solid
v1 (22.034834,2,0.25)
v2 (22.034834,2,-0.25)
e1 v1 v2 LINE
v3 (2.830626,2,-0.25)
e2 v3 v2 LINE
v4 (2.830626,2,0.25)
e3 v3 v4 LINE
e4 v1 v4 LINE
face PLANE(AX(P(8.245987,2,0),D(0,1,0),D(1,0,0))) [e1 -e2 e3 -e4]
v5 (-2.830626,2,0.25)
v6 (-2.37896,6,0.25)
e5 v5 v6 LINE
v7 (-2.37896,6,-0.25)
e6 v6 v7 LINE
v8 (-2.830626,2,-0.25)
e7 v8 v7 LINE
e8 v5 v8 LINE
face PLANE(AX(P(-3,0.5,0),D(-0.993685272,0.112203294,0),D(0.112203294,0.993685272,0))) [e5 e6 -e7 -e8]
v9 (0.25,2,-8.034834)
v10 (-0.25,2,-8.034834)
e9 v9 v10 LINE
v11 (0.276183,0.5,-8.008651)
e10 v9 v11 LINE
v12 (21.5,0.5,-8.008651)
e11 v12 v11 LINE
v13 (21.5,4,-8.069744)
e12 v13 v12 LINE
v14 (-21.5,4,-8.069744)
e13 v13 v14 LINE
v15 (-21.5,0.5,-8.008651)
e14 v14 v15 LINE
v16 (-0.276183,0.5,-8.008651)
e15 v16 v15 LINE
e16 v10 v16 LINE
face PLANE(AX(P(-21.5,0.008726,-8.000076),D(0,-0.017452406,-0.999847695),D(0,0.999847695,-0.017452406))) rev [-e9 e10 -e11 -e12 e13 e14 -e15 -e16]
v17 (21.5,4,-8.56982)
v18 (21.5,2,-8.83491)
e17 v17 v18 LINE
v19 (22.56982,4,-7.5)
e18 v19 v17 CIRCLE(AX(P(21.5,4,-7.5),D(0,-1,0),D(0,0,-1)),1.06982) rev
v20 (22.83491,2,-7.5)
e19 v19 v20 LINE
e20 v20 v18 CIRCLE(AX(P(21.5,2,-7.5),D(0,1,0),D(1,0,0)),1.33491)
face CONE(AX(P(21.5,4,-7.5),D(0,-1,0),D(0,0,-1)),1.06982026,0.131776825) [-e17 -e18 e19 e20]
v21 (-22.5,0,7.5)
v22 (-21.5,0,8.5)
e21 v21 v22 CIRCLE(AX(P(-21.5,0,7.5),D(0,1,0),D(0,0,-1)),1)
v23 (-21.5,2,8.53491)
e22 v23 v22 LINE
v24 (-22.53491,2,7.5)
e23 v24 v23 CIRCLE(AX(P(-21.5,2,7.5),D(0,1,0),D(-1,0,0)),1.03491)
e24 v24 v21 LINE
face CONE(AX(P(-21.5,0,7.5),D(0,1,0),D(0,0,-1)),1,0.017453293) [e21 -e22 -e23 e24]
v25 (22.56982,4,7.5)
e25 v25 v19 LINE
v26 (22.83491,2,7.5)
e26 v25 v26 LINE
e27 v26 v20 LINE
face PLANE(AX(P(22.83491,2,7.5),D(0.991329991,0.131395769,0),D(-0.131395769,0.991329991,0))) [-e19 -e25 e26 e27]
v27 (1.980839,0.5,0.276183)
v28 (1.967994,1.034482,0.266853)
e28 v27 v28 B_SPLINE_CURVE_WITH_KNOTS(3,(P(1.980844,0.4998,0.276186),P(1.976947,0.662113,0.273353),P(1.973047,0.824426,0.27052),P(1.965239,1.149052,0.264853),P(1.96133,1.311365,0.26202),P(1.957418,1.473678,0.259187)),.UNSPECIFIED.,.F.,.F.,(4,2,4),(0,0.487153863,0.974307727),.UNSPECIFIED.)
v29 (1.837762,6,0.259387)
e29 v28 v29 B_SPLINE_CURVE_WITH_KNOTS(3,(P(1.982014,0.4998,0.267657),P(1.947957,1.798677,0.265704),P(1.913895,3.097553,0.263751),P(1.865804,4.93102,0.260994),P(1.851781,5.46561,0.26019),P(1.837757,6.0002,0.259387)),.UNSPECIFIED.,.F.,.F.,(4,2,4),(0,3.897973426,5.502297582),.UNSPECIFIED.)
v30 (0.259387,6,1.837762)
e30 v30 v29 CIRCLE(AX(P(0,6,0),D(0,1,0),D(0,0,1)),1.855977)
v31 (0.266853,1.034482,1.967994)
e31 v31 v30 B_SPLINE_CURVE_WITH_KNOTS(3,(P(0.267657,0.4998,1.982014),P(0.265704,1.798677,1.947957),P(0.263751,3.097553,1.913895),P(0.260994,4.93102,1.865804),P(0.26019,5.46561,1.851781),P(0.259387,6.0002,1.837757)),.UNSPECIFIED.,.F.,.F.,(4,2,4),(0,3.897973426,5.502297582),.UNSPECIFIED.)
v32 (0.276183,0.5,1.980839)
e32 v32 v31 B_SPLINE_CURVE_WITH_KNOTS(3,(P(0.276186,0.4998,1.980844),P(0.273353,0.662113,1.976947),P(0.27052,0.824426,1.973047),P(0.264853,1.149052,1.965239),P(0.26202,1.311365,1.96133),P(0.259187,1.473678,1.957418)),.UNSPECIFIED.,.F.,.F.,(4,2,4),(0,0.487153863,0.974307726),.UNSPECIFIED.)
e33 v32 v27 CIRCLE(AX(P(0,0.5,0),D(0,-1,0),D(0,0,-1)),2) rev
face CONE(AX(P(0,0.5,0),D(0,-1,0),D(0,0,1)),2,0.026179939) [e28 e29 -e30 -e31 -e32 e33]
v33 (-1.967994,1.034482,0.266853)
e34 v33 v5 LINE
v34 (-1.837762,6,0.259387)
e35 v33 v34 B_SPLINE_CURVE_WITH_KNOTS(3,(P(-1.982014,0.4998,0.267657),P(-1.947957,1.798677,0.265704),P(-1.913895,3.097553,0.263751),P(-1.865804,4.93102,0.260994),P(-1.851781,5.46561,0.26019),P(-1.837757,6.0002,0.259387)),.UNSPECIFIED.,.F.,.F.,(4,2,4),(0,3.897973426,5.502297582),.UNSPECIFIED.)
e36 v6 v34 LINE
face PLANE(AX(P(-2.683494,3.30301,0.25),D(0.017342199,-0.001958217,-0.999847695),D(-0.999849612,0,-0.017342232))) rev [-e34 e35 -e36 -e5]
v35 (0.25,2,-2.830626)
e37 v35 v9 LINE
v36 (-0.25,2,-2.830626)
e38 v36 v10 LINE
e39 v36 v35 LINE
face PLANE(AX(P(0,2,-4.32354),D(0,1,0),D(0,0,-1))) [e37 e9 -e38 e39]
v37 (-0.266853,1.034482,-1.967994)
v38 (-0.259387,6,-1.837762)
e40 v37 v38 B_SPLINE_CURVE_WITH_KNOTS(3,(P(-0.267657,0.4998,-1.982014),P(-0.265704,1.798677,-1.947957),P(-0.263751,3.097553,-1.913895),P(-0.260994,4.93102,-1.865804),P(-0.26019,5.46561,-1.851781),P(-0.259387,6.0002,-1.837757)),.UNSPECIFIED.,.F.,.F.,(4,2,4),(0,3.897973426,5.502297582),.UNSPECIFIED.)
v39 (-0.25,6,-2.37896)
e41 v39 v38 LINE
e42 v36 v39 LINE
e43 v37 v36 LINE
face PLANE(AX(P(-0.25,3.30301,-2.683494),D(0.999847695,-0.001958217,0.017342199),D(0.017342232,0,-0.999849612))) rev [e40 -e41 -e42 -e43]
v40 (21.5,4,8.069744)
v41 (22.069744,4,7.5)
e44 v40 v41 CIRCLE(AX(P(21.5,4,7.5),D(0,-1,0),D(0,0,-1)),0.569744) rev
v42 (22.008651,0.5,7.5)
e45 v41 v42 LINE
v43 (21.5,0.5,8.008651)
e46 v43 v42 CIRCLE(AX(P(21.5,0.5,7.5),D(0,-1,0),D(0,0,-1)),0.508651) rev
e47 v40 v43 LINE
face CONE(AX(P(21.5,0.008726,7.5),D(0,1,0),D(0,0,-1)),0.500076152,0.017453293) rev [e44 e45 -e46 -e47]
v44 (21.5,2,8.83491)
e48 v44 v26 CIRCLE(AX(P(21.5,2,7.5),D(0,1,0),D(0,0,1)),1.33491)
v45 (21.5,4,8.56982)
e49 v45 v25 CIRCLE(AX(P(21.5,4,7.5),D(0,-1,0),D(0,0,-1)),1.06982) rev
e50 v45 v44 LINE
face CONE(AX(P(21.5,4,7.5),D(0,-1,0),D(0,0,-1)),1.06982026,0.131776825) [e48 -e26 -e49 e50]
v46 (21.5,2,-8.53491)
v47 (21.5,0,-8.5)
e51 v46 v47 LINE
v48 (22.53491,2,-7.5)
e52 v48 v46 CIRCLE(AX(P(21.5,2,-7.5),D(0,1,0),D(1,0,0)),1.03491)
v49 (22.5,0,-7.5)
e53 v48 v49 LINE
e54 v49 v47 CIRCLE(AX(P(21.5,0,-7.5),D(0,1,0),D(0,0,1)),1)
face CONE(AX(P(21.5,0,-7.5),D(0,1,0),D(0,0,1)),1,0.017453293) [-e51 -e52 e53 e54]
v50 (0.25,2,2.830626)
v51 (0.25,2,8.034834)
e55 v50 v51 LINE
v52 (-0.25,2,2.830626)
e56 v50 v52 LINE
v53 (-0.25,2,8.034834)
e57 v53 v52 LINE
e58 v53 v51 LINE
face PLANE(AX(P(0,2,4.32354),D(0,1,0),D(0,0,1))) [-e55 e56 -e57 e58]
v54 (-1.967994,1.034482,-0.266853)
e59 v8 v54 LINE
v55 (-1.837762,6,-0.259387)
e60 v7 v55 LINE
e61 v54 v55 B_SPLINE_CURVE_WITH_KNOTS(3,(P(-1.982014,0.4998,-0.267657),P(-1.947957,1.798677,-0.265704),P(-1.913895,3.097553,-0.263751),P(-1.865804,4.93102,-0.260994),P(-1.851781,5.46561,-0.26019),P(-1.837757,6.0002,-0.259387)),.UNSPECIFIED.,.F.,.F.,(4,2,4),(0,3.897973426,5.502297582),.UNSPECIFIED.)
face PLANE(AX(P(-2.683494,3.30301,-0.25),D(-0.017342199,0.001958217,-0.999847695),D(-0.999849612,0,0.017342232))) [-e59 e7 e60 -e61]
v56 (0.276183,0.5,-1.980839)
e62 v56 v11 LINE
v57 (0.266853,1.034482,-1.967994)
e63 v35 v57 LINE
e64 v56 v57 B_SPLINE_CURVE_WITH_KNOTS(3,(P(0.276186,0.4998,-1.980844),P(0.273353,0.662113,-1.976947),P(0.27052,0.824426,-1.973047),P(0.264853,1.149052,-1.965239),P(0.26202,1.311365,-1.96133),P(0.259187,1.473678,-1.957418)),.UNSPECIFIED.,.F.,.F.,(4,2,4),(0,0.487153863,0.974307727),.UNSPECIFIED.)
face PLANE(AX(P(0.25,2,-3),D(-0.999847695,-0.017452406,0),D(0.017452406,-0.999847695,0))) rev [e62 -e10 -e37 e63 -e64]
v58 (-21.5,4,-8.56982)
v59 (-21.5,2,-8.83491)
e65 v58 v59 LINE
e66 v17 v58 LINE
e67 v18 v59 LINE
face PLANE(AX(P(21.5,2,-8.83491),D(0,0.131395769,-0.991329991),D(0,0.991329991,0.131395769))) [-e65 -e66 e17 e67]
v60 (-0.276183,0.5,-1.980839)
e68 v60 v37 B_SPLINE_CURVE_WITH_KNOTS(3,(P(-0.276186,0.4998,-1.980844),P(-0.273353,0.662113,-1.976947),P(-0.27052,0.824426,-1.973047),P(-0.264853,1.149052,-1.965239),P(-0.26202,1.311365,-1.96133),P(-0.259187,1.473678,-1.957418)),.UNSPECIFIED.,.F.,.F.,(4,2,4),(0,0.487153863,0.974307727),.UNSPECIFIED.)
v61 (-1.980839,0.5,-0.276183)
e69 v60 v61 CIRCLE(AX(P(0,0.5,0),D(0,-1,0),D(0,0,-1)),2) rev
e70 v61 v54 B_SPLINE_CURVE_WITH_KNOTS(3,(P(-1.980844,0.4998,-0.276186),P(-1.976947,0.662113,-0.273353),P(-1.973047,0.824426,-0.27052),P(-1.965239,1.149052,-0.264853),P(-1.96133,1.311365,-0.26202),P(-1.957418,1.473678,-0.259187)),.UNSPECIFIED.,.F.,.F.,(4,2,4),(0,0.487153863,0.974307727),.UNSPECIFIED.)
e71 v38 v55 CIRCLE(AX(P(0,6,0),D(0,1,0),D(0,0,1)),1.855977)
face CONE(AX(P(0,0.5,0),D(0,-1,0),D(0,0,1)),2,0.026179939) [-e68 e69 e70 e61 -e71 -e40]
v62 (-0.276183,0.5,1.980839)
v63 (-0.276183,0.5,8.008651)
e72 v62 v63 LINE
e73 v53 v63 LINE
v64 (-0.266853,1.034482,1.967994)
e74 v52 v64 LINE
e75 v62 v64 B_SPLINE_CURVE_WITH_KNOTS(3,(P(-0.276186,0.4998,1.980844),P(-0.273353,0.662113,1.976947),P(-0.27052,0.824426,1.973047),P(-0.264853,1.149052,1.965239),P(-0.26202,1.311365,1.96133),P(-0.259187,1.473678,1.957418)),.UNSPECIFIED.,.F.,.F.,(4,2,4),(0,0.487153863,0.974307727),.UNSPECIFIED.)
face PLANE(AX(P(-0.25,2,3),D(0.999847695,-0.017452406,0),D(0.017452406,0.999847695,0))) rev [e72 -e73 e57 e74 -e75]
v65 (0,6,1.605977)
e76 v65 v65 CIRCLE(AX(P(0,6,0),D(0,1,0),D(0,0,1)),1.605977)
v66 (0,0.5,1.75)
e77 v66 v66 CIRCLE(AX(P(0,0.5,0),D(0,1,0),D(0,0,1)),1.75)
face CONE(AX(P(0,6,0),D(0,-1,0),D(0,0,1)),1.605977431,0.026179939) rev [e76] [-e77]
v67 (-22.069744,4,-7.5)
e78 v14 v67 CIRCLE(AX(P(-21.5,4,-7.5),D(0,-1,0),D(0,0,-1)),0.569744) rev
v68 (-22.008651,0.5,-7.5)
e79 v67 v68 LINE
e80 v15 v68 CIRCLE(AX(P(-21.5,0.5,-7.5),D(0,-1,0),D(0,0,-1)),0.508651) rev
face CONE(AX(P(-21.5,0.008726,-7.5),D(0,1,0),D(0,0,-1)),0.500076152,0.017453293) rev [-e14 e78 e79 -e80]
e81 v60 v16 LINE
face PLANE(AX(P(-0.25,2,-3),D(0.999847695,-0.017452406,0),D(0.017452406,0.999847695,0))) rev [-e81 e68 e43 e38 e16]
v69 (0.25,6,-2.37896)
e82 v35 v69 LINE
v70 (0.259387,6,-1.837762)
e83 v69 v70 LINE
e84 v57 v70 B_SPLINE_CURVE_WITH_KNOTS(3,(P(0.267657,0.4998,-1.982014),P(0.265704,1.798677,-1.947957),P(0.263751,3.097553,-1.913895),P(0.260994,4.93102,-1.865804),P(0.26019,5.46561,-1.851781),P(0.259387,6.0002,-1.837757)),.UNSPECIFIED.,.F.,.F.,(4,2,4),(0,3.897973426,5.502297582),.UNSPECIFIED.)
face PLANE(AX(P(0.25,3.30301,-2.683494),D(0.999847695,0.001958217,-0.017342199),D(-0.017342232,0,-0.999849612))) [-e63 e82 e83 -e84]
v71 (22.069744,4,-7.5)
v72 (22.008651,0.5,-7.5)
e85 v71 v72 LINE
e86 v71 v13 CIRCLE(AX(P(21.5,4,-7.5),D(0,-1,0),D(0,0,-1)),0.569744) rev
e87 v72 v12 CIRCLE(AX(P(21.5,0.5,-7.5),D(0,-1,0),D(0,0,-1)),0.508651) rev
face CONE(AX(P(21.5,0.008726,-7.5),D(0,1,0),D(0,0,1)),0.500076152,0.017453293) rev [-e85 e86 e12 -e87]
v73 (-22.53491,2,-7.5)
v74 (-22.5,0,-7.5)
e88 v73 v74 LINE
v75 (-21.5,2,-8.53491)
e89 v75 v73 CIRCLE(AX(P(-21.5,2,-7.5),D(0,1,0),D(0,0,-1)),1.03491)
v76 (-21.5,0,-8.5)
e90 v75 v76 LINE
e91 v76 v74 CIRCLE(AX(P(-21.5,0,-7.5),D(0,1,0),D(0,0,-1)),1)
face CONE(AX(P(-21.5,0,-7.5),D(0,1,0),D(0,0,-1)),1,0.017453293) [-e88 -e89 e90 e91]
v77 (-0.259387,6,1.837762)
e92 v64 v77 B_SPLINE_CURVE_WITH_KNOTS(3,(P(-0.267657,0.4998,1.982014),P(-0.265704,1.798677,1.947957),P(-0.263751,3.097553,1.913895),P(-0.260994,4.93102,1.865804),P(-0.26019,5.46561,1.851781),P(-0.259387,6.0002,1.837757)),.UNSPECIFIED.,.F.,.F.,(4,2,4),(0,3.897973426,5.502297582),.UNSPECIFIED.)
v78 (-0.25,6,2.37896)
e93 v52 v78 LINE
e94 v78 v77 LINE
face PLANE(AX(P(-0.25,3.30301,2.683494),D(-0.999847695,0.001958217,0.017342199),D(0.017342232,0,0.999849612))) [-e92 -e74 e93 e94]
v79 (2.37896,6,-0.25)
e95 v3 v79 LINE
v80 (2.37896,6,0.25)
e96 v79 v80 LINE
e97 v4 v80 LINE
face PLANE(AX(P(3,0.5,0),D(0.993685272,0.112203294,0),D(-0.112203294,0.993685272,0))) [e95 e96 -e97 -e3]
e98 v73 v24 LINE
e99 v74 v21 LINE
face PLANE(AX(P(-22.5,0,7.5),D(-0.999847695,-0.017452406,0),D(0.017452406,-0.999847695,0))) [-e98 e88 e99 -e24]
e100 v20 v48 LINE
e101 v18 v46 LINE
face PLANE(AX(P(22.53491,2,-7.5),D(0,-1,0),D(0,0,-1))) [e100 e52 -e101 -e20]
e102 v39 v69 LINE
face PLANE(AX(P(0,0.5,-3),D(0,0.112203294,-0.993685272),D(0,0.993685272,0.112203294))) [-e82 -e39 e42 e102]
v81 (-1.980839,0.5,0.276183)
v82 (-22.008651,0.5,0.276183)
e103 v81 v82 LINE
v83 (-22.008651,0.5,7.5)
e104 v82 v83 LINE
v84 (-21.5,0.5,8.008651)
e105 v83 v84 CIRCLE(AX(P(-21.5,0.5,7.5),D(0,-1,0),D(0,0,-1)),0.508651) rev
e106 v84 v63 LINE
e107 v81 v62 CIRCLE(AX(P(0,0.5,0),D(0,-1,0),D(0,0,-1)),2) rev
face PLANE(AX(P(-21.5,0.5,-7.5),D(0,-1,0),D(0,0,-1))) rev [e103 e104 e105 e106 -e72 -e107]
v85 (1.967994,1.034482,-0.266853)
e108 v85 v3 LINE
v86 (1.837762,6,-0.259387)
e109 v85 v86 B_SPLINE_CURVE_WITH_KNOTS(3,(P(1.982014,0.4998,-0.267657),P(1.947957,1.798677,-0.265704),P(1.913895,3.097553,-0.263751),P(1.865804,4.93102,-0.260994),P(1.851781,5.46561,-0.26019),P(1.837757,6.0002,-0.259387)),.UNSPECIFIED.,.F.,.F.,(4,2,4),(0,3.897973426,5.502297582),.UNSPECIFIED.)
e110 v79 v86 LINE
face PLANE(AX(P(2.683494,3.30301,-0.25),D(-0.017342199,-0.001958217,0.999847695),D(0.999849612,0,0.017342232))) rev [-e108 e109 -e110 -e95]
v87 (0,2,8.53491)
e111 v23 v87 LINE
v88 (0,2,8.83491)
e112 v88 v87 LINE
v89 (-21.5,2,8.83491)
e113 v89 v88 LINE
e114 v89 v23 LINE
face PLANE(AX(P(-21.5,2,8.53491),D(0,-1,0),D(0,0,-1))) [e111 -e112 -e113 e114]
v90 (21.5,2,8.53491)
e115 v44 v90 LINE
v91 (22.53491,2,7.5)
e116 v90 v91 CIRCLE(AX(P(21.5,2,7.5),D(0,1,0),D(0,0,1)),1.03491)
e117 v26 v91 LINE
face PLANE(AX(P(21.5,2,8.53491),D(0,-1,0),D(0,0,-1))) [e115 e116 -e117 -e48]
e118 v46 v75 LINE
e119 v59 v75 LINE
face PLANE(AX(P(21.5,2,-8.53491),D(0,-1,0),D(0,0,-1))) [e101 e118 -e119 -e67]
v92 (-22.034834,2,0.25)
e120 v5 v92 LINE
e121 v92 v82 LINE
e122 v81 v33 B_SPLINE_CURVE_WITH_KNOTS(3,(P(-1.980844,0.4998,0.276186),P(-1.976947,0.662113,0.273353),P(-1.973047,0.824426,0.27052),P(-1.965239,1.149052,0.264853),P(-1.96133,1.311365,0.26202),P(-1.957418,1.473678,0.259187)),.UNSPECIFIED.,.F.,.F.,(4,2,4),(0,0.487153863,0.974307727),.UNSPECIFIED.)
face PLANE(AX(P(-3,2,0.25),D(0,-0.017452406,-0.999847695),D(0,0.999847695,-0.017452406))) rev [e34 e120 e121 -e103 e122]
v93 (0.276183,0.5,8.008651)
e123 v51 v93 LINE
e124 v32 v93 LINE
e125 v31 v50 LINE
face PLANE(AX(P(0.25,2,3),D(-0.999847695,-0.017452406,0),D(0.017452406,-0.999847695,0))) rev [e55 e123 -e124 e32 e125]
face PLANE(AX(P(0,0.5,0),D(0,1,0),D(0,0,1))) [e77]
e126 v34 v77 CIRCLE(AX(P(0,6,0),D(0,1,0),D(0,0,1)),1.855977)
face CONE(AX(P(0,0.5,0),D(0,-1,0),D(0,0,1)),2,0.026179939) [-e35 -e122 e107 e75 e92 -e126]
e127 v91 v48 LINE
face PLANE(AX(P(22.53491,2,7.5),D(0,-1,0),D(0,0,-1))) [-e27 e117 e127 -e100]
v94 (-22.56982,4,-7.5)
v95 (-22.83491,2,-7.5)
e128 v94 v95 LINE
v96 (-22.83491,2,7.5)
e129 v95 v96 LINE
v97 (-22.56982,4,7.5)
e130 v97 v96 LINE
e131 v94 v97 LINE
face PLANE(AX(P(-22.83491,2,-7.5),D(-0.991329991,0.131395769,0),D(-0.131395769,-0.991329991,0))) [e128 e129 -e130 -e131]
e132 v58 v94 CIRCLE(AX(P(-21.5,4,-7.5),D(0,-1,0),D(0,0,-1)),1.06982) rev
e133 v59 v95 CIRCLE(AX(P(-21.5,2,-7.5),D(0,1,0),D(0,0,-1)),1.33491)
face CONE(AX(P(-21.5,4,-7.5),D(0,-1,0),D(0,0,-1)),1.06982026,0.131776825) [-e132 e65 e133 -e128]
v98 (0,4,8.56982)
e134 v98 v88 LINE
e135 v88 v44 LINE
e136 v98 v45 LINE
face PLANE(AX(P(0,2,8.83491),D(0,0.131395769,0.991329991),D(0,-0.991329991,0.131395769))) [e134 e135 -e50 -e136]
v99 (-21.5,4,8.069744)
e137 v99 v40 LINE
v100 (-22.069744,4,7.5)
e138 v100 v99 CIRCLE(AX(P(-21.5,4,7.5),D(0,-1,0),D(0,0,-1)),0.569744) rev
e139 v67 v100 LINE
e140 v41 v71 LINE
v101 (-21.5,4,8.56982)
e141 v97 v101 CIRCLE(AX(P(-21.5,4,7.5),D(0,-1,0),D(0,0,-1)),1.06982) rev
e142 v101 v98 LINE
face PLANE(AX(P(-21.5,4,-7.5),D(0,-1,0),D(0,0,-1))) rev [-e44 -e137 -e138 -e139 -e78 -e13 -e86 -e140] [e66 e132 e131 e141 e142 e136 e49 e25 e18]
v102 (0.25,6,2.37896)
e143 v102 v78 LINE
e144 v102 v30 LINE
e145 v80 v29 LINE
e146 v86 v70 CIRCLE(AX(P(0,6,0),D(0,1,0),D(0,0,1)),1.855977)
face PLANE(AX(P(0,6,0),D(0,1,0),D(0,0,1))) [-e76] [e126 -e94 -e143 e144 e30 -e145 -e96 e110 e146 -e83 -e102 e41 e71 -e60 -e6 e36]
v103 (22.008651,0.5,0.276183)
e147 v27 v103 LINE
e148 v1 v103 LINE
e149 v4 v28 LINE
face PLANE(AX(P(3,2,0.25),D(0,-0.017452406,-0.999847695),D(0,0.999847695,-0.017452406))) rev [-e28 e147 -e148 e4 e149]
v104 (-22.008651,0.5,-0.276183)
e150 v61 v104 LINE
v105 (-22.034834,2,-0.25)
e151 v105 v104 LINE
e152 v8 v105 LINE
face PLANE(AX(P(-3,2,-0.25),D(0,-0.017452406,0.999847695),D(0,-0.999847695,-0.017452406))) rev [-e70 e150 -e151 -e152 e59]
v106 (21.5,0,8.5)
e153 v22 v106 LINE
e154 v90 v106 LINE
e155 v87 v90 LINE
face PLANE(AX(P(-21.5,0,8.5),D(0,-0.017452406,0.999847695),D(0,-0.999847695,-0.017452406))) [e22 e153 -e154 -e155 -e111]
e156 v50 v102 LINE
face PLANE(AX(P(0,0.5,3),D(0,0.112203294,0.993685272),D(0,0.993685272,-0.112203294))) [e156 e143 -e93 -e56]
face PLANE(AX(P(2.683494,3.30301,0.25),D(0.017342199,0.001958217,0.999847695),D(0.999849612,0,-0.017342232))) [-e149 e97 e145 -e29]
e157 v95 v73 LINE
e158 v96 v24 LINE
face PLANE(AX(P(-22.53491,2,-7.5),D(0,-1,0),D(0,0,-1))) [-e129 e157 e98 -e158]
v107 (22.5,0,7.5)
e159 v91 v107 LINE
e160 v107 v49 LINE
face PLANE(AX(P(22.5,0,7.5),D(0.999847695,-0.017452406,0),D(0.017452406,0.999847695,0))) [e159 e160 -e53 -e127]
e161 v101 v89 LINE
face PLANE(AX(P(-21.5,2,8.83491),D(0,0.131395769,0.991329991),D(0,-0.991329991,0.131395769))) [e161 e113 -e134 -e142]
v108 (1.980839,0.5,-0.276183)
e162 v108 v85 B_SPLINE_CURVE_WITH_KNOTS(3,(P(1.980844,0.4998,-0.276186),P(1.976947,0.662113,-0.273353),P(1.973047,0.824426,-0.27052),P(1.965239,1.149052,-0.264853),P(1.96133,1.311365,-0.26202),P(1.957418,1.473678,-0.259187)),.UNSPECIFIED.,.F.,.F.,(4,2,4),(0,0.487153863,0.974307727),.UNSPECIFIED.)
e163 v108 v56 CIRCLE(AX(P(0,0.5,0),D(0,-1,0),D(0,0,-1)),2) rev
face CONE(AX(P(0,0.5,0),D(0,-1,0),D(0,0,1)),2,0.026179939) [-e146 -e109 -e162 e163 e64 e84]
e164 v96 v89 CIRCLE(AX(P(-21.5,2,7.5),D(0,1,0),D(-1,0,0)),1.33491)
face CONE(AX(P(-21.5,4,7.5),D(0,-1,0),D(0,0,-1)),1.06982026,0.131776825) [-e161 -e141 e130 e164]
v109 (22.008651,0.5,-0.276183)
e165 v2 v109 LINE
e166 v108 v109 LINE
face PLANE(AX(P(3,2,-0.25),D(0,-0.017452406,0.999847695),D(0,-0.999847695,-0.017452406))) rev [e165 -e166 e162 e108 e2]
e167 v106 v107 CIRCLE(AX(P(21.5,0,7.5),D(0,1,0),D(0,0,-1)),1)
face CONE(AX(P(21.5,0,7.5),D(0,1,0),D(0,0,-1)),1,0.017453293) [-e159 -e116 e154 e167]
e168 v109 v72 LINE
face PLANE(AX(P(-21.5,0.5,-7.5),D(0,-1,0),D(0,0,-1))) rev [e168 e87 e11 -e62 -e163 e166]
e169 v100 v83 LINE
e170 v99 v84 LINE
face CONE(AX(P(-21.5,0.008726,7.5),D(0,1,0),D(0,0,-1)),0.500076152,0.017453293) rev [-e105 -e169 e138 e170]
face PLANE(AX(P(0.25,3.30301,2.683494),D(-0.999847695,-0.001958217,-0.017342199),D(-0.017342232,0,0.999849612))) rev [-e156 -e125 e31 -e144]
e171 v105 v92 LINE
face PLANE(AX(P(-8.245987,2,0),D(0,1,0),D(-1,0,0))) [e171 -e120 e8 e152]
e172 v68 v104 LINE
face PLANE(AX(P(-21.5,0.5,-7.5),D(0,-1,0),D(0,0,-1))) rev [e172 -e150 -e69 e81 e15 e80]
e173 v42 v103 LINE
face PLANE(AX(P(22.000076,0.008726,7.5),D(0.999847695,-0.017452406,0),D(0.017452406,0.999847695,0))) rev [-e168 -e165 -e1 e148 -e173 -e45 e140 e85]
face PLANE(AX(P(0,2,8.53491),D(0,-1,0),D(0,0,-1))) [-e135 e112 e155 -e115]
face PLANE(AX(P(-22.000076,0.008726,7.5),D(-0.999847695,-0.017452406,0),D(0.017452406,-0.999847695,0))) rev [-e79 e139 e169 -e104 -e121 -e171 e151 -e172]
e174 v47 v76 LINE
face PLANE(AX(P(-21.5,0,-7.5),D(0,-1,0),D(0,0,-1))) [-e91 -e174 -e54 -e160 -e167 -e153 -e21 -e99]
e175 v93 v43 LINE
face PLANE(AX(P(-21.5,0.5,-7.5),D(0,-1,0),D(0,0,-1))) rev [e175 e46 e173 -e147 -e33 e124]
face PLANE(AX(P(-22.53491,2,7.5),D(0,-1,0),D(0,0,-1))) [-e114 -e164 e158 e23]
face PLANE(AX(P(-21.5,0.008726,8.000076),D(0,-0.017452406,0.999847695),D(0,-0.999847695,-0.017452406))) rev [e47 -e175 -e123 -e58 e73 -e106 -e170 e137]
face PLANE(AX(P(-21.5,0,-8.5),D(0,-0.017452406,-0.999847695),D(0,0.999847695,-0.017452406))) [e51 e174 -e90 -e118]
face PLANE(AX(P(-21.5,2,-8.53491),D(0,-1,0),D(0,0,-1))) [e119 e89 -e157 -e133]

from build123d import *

# Parameters (mm, degrees)
BOSS_EXTRUDE1_DEPTH = 4
BOSS_EXTRUDE1_DRAFT = -1
SHELL1_T            = -0.5
SKETCH2_R           = 2
BOSS_EXTRUDE2_DEPTH = 5.5
BOSS_EXTRUDE2_TAPER = 1.5
CIRPATTERN1_COUNT   = 4
SKETCH4_R           = 1.605977431
CUT_EXTRUDE1_DEPTH  = 5.5
CUT_EXTRUDE1_DRAFT  = 1.5
RIB3_START          = -22.069744096
RIB3_DEPTH          = 20.231981802
RIB3_START_2        = 1.837762294
RIB3_2_DEPTH        = 20.231981802
RIB3_START_3        = -8.069744096
RIB3_3_DEPTH        = 6.231981802
RIB3_4_DEPTH        = 6.231981802


with BuildPart() as part:
    # Sketch1 → Boss-Extrude1 (with draft: the straight prism first)
    with BuildSketch(Plane(origin=(0, 0, 0), x_dir=(1, 0, 0), z_dir=(0, 1, 0))):
        with BuildLine():
            Line((-21.5, -8.5), (21.5, -8.5))
            ThreePointArc((21.5, -8.5), (22.207106781, -8.207106781), (22.5, -7.5))
            Line((22.5, -7.5), (22.5, 7.5))
            ThreePointArc((22.5, 7.5), (22.207106781, 8.207106781), (21.5, 8.5))
            Line((21.5, 8.5), (-21.5, 8.5))
            ThreePointArc((-21.5, 8.5), (-22.207106781, 8.207106781), (-22.5, 7.5))
            Line((-22.5, 7.5), (-22.5, -7.5))
            ThreePointArc((-22.5, -7.5), (-22.207106781, -8.207106781), (-21.5, -8.5))
        make_face()
    extrude(amount=BOSS_EXTRUDE1_DEPTH)
    # Boss-Extrude1: the draft: its side faces are tilted about the plane it starts from
    boss_extrude1_sides = [part.faces().sort_by_distance(p)[0] for p in [
        (0, 2, 8.5),
        (22.207106781, 2, 8.207106781),
        (22.5, 2, 0),
        (22.207106781, 2, -8.207106781),
        (0, 2, -8.5),
        (-22.207106781, 2, -8.207106781),
        (-22.5, 2, 0),
        (-22.207106781, 2, 8.207106781),
    ]]
    draft(boss_extrude1_sides, Plane(origin=(0, 0, 0), x_dir=(1, 0, 0), z_dir=(0, 1, 0)), BOSS_EXTRUDE1_DRAFT)

    # Shell1
    shell1_openings = [part.faces().sort_by_distance(p)[0] for p in [
        (0, 4, 0),
    ]]
    offset(amount=SHELL1_T, openings=shell1_openings, kind=Kind.INTERSECTION)

    # Sketch2 → Boss-Extrude2 (add)
    with BuildSketch(Plane(origin=(0, 0.5, 0), x_dir=(1, 0, 0), z_dir=(0, 1, 0))):
        Circle(SKETCH2_R)
    extrude(amount=BOSS_EXTRUDE2_DEPTH, taper=BOSS_EXTRUDE2_TAPER)

    # Rib2: read off the stored shape, not the designer's step
    # Rib2: loft between two sections, ruled curve by curve
    rib2_from = [
        Edge.make_line((1.837762394, 6, 0.25938699), (2.378960183, 6, 0.25)),
        Edge.make_line((1.837762394, 6, -0.25938699), (2.378960183, 6, -0.25)),
        Edge.make_line((2.378960183, 6, -0.25), (2.378960183, 6, 0.25)),
        Edge.make_line((1.837762394, 6, -0.25938699), (1.837762394, 6, 0.25938699)),
    ]
    rib2_to = [
        Edge.make_line((1.982009028, 0.5, 0.267656891), (3, 0.5, 0.25)),
        Edge.make_line((1.982009028, 0.5, -0.267656891), (3, 0.5, -0.25)),
        Edge.make_line((3, 0.5, -0.25), (3, 0.5, 0.25)),
        Edge.make_line((1.982009028, 0.5, -0.267656891), (1.982009028, 0.5, 0.267656891)),
    ]
    rib2 = Solid(Shell([*[Face.make_surface_from_curves(rib2_from[k], rib2_to[k]) for k in range(4)], Face(Wire(rib2_from)), Face(Wire(rib2_to))]))
    add(rib2)

    # CirPattern1: Rib2 ×4 about axis
    cirpattern1_axis = Axis((0, 0, 0), (0, 1, 0))
    for i in range(1, CIRPATTERN1_COUNT):
        add(rib2.rotate(cirpattern1_axis, i * 360 / CIRPATTERN1_COUNT))


with BuildPart() as cut_extrude1_tool:
    # Sketch4 → Cut-Extrude1 (with draft: the straight prism first)
    with BuildSketch(Plane(origin=(0, 6, 0), x_dir=(1, 0, 0), z_dir=(0, 1, 0))):
        Circle(SKETCH4_R)
    extrude(amount=-CUT_EXTRUDE1_DEPTH)
    # Cut-Extrude1: the draft: its side faces are tilted about the plane it starts from
    cut_extrude1_sides = [cut_extrude1_tool.faces().sort_by_distance(p)[0] for p in [
        (-1.605977431, 3.25, 0),
    ]]
    draft(cut_extrude1_sides, Plane(origin=(0, 6, 0), x_dir=(1, 0, 0), z_dir=(0, 1, 0)), CUT_EXTRUDE1_DRAFT)


with BuildPart() as part_1:
    add(part.part)

    # Cut-Extrude1: cut by cut_extrude1_tool
    add(cut_extrude1_tool.part, mode=Mode.SUBTRACT)

    # Rib3: read off the stored shape, not the designer's step
    # Rib3 outline → Rib3 (add)
    with BuildSketch(Plane.YZ.offset(RIB3_START)):
        Polygon((0.5, -0.276182597), (2, -0.25), (2, 0.25), (0.5, 0.276182597), align=None)
    extrude(amount=RIB3_DEPTH)

    # Rib3 2 outline → Rib3 2 (add)
    with BuildSketch(Plane.YZ.offset(RIB3_START_2)):
        Polygon((0.5, -0.276182597), (2, -0.25), (2, 0.25), (0.5, 0.276182597), align=None)
    extrude(amount=RIB3_2_DEPTH)

    # Rib3 3 outline → Rib3 3 (add)
    with BuildSketch(Plane.XY.offset(RIB3_START_3)):
        Polygon((0.276182597, 0.5), (0.25, 2), (-0.25, 2), (-0.276182597, 0.5), align=None)
    extrude(amount=RIB3_3_DEPTH)

    # Rib3 4 outline → Rib3 4 (add)
    with BuildSketch(Plane.XY.offset(RIB3_START_2)):
        Polygon((0.276182597, 0.5), (0.25, 2), (-0.25, 2), (-0.276182597, 0.5), align=None)
    extrude(amount=RIB3_4_DEPTH)

    # Sweep1: sweep along a path in Sketch8
    with BuildLine(Plane(origin=(0, 2, 0), x_dir=(-1, 0, 0), z_dir=(0, -1, 0))) as sweep1_path:
        Line((22.56982026, 7.5), (22.56982026, -7.5))
        ThreePointArc((22.56982026, -7.5), (22.25647716, -8.25647716), (21.5, -8.56982026))
        Line((21.5, -8.56982026), (-21.5, -8.56982026))
        ThreePointArc((-21.5, -8.56982026), (-22.25647716, -8.25647716), (-22.56982026, -7.5))
        Line((-22.56982026, -7.5), (-22.56982026, 7.5))
        ThreePointArc((-22.56982026, 7.5), (-22.25647716, 8.25647716), (-21.5, 8.56982026))
        Line((-21.5, 8.56982026), (21.5, 8.56982026))
        ThreePointArc((21.5, 8.56982026), (22.25647716, 8.25647716), (22.56982026, 7.5))
    # Sketch5 → Sweep1 (sweep)
    with BuildSketch(Plane(origin=(0, 0, 0), x_dir=(0, 0, -1), z_dir=(1, 0, 0))):
        Polygon((-8.83491013, 2), (-8.56982026, 4), (-8.53491013, 2), align=None)
    sweep(path=sweep1_path.line)


solid = part_1.part
